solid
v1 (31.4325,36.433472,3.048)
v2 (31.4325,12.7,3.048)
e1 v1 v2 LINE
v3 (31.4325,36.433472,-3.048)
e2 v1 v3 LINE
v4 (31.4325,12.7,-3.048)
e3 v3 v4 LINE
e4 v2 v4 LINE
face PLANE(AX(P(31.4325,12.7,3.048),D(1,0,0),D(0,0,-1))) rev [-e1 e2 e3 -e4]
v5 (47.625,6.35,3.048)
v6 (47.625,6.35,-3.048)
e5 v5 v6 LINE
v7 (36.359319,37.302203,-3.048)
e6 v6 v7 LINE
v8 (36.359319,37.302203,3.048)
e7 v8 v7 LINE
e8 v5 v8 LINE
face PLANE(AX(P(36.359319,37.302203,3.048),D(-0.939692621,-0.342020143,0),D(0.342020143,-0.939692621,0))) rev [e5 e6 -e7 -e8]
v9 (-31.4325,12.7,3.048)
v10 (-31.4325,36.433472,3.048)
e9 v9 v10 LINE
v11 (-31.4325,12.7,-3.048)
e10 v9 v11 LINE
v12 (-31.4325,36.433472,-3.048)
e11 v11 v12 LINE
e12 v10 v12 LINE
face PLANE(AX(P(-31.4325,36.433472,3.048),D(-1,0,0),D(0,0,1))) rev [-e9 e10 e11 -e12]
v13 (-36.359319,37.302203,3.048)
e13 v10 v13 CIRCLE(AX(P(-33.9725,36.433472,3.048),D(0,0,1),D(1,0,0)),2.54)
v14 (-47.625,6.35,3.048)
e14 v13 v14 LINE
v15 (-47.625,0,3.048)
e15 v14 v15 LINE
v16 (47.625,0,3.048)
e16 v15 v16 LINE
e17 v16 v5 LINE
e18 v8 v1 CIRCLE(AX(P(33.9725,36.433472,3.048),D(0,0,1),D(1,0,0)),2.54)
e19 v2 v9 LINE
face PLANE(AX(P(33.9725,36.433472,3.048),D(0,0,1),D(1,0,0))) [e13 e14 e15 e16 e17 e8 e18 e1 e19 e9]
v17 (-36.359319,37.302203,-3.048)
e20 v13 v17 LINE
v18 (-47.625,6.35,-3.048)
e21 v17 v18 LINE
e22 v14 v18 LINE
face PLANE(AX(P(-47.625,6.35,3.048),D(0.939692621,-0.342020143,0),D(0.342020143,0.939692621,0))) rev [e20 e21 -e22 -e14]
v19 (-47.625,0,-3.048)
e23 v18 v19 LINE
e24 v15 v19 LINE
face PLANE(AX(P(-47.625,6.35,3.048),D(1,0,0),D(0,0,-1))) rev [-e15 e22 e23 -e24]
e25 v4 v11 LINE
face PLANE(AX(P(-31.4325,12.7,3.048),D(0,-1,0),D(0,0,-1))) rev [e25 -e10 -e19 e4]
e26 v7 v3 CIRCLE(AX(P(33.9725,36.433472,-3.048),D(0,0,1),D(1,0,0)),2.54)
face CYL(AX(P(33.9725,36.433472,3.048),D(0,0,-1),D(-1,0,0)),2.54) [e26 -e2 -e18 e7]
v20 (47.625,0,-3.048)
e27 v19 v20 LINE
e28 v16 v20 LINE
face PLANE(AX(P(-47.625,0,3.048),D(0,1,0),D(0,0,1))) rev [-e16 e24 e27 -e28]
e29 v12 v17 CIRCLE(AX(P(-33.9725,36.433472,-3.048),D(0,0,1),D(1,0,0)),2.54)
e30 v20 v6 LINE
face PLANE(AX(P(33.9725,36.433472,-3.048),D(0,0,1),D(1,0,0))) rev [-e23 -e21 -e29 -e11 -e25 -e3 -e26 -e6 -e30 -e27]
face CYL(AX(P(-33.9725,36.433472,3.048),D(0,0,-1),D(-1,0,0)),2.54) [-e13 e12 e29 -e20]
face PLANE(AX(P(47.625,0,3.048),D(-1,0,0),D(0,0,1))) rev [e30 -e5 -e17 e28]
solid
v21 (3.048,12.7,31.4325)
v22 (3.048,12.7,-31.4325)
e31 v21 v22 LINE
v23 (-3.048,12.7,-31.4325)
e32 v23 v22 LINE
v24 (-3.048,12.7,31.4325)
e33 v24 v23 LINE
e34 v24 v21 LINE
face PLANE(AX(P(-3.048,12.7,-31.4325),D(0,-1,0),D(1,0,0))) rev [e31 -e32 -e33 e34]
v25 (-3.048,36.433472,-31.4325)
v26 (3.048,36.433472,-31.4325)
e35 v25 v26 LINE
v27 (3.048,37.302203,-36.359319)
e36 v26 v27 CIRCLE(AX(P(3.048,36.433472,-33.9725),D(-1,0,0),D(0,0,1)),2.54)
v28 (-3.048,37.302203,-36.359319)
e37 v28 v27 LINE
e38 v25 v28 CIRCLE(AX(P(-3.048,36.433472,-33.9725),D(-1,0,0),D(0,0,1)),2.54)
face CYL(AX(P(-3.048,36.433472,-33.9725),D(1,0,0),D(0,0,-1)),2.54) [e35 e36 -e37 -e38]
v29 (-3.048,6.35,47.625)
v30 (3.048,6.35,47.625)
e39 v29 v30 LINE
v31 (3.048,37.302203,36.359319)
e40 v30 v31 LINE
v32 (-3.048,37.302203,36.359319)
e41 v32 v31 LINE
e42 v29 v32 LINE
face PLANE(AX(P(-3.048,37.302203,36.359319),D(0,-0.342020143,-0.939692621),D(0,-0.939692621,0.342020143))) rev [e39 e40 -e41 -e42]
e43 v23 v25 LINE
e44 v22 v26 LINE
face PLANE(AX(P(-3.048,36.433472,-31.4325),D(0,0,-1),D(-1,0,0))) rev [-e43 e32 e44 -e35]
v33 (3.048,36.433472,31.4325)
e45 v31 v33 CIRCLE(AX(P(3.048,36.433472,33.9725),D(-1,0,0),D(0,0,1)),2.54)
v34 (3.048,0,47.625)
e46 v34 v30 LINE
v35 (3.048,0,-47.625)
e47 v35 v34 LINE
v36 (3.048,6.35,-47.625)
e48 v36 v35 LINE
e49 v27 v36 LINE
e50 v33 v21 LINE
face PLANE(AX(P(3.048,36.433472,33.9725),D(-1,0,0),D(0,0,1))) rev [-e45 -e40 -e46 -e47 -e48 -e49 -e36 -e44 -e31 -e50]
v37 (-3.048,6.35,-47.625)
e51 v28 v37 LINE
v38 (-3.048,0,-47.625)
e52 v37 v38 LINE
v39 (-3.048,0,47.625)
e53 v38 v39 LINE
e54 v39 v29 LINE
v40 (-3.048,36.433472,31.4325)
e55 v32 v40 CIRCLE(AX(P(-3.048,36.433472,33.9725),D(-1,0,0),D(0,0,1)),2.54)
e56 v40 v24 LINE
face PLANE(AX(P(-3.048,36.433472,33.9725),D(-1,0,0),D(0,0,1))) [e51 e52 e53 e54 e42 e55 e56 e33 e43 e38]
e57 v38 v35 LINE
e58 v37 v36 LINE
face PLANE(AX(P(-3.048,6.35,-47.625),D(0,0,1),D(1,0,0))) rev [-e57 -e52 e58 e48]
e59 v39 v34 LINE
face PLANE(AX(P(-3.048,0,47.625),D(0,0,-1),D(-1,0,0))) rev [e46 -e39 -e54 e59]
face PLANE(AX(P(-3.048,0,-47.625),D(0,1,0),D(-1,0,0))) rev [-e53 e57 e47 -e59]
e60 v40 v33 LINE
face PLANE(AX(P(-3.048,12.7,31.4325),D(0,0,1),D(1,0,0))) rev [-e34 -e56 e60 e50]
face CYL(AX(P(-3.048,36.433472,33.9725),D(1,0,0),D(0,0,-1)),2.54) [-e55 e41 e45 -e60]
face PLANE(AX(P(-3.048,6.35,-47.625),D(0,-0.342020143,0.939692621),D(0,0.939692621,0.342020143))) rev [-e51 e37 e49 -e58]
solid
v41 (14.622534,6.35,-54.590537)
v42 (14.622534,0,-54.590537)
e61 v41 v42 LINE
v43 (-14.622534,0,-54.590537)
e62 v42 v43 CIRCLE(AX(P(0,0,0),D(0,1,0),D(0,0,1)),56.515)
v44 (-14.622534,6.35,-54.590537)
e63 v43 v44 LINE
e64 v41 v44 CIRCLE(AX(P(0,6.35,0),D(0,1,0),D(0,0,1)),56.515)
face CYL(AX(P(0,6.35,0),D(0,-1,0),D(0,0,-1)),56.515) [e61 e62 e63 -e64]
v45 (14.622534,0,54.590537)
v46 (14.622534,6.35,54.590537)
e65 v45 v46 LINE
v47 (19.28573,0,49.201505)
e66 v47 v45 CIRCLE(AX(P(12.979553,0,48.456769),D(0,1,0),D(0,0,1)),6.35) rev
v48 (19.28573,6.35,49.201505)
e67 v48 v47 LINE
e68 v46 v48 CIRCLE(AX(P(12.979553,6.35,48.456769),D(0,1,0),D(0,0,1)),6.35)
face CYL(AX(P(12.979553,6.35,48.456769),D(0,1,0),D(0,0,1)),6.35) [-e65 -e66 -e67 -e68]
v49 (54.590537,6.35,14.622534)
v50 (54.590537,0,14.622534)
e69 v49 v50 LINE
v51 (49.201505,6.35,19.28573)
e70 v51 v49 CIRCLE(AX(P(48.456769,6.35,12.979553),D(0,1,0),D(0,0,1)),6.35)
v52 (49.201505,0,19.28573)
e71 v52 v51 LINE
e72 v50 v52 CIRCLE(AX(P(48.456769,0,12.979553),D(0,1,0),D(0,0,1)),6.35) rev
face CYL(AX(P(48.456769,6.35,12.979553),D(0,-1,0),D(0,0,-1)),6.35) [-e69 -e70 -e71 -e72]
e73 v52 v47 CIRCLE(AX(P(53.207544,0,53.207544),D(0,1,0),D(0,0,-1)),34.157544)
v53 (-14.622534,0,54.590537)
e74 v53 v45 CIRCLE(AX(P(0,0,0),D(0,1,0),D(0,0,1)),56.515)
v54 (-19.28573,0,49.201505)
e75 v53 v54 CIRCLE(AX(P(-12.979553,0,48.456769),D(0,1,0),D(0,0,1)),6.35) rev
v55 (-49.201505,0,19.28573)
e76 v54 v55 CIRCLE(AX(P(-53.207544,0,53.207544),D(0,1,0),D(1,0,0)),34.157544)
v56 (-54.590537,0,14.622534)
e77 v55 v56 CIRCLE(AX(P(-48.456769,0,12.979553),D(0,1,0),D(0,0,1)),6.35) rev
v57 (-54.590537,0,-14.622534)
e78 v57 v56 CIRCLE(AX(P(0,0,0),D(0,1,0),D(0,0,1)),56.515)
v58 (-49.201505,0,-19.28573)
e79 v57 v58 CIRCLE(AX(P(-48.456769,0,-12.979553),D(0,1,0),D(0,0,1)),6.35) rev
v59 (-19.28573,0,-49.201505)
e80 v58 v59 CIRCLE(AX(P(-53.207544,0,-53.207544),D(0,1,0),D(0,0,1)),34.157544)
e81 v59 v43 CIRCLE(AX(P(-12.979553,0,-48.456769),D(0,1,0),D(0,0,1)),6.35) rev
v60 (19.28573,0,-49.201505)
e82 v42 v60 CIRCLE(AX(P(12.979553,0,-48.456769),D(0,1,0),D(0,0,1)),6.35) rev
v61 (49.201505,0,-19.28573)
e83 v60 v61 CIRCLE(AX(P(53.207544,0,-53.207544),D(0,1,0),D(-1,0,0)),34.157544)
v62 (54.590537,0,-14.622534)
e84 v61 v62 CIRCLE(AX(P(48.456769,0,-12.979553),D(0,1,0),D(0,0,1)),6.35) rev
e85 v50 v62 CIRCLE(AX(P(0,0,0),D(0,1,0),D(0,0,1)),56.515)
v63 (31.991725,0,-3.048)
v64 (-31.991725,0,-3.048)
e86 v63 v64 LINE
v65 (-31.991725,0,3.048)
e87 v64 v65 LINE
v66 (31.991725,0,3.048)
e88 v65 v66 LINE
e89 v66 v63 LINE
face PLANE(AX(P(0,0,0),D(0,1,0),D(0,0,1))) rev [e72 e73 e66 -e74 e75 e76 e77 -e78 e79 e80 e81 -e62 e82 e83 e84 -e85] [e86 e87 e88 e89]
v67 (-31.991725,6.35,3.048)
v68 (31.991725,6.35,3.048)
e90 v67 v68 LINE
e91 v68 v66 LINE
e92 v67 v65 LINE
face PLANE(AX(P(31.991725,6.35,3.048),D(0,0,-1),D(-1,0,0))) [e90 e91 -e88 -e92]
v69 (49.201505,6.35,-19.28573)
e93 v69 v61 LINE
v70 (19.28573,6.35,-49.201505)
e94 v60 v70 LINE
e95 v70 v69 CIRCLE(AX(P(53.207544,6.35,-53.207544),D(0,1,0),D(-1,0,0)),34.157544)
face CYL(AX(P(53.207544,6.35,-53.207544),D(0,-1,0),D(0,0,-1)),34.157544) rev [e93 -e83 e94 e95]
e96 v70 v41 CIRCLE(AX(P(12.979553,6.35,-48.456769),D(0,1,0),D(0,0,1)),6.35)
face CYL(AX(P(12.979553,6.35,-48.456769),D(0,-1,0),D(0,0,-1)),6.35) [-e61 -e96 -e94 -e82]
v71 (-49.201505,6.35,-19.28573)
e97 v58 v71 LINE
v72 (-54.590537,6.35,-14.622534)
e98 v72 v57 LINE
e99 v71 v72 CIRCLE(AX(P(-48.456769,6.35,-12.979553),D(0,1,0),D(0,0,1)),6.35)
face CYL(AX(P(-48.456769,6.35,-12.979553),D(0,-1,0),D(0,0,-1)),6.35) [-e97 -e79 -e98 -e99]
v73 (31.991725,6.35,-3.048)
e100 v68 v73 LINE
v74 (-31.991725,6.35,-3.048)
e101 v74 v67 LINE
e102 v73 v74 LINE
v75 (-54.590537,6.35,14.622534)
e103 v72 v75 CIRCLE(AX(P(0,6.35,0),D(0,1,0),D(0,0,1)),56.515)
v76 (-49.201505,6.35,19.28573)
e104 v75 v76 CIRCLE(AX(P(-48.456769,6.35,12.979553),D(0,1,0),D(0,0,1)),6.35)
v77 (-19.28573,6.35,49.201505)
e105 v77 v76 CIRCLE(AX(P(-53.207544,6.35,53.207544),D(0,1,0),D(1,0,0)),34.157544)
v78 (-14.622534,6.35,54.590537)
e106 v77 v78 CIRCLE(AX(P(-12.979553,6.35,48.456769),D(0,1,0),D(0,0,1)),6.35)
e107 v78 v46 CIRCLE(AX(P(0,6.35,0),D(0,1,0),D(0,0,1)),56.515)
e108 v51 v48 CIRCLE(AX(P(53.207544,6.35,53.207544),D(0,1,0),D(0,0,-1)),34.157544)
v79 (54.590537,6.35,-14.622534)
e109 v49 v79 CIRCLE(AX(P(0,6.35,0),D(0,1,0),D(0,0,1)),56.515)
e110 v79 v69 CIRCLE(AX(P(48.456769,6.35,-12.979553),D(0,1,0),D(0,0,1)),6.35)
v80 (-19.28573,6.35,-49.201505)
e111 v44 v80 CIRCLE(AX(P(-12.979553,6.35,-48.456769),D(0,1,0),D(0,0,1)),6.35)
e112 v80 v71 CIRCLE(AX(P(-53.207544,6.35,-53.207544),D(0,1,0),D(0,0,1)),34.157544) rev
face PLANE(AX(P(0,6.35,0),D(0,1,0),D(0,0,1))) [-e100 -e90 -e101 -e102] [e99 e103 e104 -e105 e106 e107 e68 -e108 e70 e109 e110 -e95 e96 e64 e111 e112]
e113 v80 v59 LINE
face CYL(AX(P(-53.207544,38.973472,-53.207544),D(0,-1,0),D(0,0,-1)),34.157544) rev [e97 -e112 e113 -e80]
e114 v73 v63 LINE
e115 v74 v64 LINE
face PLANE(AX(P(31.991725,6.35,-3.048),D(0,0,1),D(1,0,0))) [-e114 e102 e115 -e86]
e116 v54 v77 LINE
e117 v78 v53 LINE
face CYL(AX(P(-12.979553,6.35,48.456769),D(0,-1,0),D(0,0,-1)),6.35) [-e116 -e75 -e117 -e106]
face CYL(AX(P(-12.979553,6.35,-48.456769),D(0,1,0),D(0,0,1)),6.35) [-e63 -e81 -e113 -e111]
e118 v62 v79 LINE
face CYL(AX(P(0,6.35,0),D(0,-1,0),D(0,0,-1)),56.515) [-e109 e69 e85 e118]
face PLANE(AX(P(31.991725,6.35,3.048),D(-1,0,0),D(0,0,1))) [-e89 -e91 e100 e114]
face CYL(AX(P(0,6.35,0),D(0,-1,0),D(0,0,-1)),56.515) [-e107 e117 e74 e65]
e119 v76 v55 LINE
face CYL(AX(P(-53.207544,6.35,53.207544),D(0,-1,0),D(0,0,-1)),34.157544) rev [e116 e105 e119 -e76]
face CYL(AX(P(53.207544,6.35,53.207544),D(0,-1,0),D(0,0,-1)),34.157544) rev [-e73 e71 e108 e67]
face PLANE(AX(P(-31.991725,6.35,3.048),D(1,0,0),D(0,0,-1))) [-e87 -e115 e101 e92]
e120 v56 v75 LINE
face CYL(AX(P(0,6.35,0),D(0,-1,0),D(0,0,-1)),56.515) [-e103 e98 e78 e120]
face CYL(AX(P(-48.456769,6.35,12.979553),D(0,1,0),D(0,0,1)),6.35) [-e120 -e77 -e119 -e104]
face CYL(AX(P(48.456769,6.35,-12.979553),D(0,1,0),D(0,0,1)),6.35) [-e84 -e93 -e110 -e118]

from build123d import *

# Parameters (mm, degrees)
SKETCH1_R           = 56.515
SKETCH1_W           = 63.983450824
SKETCH1_H           = 6.096
BOSS_EXTRUDE1_DEPTH = 6.35
BOSS_EXTRUDE2_DEPTH = 3.048
CIRPATTERN1_COUNT   = 2
CIRPATTERN1_ANGLE   = 90
SKETCH3_R           = 34.157543873
CUT_EXTRUDE1_DEPTH  = 89.920312598
FILLET1_START       = -1
FILLET1_DEPTH       = 8
CIRPATTERN2_COUNT   = 4


with BuildPart() as part:
    # Sketch1 → Boss-Extrude1 (new body)
    with BuildSketch(Plane(origin=(0, 0, 0), x_dir=(1, 0, 0), z_dir=(0, 1, 0))):
        with Locations(Location((0, 0, 0), (0, 0, 270))):
            Circle(SKETCH1_R)
        Rectangle(SKETCH1_W, SKETCH1_H, mode=Mode.SUBTRACT)
    extrude(amount=BOSS_EXTRUDE1_DEPTH)

    # Sketch3 → Cut-Extrude1 (cut, through all)
    with BuildSketch(Plane(origin=(0, 0, 0), x_dir=(1, 0, 0), z_dir=(0, 1, 0))):
        with Locations((-53.207543873, 53.207543873)):
            Circle(SKETCH3_R)
    cut_extrude1 = extrude(amount=CUT_EXTRUDE1_DEPTH, mode=Mode.SUBTRACT)

    # Fillet1: read off the stored shape, not the designer's step
    # Fillet1 outline → Fillet1 (cut)
    with BuildSketch(Plane(origin=(0, 0, 0), x_dir=(1, 0, 0), z_dir=(0, 1, 0)).offset(FILLET1_START)):
        with BuildLine():
            ThreePointArc((-53.207543873, 19.05), (-53.944482234, 16.850461759), (-54.590536828, 14.622534453))
            ThreePointArc((-54.590536828, 14.622534453), (-52.611862262, 17.781396141), (-49.201504559, 19.285730059))
            ThreePointArc((-49.201504559, 19.285730059), (-51.201059407, 19.108983441), (-53.207543873, 19.05))
        make_face()
        with BuildLine():
            ThreePointArc((-19.285730059, 49.201504559), (-17.781396141, 52.611862262), (-14.622534453, 54.590536828))
            ThreePointArc((-14.622534453, 54.590536828), (-16.850461759, 53.944482234), (-19.05, 53.207543873))
            ThreePointArc((-19.05, 53.207543873), (-19.108983441, 51.201059407), (-19.285730059, 49.201504559))
        make_face()
    fillet1 = extrude(amount=FILLET1_DEPTH, mode=Mode.SUBTRACT)

    # CirPattern2: Cut-Extrude1, Fillet1 ×4 about axis
    cirpattern2_axis = Axis((0, 0, 0), (0, 1, 0))
    add([cut_extrude1.rotate(cirpattern2_axis, i * 360 / CIRPATTERN2_COUNT) for i in range(1, CIRPATTERN2_COUNT)], mode=Mode.SUBTRACT)
    add([fillet1.rotate(cirpattern2_axis, i * 360 / CIRPATTERN2_COUNT) for i in range(1, CIRPATTERN2_COUNT)], mode=Mode.SUBTRACT)


with BuildPart() as body_2:
    # Sketch2 → Boss-Extrude2 (new, symmetric)
    with BuildSketch(Plane.XY):
        with BuildLine():
            Line((-47.625, 6.35), (-36.359319257, 37.302203457))
            ThreePointArc((-36.359319257, 37.302203457), (-33.531433629, 38.934883985), (-31.4325, 36.433472293))
            Line((-31.4325, 36.433472293), (-31.4325, 12.7))
            Line((-31.4325, 12.7), (31.4325, 12.7))
            Line((31.4325, 12.7), (31.4325, 36.433472293))
            ThreePointArc((31.4325, 36.433472293), (33.531433629, 38.934883985), (36.359319257, 37.302203457))
            Line((36.359319257, 37.302203457), (47.625, 6.35))
            Line((47.625, 6.35), (47.625, 0))
            Line((47.625, 0), (-47.625, 0))
            Line((-47.625, 0), (-47.625, 6.35))
        make_face()
    extrude(amount=BOSS_EXTRUDE2_DEPTH, both=True)


with BuildPart() as cirpattern1_1:
    # CirPattern1: pattern copy
    add(body_2.part.rotate(Axis((0, 0, 0), (0, -1, 0)), 1 * CIRPATTERN1_ANGLE / (CIRPATTERN1_COUNT - 1)))


solid = Compound([part.part, body_2.part, cirpattern1_1.part])
